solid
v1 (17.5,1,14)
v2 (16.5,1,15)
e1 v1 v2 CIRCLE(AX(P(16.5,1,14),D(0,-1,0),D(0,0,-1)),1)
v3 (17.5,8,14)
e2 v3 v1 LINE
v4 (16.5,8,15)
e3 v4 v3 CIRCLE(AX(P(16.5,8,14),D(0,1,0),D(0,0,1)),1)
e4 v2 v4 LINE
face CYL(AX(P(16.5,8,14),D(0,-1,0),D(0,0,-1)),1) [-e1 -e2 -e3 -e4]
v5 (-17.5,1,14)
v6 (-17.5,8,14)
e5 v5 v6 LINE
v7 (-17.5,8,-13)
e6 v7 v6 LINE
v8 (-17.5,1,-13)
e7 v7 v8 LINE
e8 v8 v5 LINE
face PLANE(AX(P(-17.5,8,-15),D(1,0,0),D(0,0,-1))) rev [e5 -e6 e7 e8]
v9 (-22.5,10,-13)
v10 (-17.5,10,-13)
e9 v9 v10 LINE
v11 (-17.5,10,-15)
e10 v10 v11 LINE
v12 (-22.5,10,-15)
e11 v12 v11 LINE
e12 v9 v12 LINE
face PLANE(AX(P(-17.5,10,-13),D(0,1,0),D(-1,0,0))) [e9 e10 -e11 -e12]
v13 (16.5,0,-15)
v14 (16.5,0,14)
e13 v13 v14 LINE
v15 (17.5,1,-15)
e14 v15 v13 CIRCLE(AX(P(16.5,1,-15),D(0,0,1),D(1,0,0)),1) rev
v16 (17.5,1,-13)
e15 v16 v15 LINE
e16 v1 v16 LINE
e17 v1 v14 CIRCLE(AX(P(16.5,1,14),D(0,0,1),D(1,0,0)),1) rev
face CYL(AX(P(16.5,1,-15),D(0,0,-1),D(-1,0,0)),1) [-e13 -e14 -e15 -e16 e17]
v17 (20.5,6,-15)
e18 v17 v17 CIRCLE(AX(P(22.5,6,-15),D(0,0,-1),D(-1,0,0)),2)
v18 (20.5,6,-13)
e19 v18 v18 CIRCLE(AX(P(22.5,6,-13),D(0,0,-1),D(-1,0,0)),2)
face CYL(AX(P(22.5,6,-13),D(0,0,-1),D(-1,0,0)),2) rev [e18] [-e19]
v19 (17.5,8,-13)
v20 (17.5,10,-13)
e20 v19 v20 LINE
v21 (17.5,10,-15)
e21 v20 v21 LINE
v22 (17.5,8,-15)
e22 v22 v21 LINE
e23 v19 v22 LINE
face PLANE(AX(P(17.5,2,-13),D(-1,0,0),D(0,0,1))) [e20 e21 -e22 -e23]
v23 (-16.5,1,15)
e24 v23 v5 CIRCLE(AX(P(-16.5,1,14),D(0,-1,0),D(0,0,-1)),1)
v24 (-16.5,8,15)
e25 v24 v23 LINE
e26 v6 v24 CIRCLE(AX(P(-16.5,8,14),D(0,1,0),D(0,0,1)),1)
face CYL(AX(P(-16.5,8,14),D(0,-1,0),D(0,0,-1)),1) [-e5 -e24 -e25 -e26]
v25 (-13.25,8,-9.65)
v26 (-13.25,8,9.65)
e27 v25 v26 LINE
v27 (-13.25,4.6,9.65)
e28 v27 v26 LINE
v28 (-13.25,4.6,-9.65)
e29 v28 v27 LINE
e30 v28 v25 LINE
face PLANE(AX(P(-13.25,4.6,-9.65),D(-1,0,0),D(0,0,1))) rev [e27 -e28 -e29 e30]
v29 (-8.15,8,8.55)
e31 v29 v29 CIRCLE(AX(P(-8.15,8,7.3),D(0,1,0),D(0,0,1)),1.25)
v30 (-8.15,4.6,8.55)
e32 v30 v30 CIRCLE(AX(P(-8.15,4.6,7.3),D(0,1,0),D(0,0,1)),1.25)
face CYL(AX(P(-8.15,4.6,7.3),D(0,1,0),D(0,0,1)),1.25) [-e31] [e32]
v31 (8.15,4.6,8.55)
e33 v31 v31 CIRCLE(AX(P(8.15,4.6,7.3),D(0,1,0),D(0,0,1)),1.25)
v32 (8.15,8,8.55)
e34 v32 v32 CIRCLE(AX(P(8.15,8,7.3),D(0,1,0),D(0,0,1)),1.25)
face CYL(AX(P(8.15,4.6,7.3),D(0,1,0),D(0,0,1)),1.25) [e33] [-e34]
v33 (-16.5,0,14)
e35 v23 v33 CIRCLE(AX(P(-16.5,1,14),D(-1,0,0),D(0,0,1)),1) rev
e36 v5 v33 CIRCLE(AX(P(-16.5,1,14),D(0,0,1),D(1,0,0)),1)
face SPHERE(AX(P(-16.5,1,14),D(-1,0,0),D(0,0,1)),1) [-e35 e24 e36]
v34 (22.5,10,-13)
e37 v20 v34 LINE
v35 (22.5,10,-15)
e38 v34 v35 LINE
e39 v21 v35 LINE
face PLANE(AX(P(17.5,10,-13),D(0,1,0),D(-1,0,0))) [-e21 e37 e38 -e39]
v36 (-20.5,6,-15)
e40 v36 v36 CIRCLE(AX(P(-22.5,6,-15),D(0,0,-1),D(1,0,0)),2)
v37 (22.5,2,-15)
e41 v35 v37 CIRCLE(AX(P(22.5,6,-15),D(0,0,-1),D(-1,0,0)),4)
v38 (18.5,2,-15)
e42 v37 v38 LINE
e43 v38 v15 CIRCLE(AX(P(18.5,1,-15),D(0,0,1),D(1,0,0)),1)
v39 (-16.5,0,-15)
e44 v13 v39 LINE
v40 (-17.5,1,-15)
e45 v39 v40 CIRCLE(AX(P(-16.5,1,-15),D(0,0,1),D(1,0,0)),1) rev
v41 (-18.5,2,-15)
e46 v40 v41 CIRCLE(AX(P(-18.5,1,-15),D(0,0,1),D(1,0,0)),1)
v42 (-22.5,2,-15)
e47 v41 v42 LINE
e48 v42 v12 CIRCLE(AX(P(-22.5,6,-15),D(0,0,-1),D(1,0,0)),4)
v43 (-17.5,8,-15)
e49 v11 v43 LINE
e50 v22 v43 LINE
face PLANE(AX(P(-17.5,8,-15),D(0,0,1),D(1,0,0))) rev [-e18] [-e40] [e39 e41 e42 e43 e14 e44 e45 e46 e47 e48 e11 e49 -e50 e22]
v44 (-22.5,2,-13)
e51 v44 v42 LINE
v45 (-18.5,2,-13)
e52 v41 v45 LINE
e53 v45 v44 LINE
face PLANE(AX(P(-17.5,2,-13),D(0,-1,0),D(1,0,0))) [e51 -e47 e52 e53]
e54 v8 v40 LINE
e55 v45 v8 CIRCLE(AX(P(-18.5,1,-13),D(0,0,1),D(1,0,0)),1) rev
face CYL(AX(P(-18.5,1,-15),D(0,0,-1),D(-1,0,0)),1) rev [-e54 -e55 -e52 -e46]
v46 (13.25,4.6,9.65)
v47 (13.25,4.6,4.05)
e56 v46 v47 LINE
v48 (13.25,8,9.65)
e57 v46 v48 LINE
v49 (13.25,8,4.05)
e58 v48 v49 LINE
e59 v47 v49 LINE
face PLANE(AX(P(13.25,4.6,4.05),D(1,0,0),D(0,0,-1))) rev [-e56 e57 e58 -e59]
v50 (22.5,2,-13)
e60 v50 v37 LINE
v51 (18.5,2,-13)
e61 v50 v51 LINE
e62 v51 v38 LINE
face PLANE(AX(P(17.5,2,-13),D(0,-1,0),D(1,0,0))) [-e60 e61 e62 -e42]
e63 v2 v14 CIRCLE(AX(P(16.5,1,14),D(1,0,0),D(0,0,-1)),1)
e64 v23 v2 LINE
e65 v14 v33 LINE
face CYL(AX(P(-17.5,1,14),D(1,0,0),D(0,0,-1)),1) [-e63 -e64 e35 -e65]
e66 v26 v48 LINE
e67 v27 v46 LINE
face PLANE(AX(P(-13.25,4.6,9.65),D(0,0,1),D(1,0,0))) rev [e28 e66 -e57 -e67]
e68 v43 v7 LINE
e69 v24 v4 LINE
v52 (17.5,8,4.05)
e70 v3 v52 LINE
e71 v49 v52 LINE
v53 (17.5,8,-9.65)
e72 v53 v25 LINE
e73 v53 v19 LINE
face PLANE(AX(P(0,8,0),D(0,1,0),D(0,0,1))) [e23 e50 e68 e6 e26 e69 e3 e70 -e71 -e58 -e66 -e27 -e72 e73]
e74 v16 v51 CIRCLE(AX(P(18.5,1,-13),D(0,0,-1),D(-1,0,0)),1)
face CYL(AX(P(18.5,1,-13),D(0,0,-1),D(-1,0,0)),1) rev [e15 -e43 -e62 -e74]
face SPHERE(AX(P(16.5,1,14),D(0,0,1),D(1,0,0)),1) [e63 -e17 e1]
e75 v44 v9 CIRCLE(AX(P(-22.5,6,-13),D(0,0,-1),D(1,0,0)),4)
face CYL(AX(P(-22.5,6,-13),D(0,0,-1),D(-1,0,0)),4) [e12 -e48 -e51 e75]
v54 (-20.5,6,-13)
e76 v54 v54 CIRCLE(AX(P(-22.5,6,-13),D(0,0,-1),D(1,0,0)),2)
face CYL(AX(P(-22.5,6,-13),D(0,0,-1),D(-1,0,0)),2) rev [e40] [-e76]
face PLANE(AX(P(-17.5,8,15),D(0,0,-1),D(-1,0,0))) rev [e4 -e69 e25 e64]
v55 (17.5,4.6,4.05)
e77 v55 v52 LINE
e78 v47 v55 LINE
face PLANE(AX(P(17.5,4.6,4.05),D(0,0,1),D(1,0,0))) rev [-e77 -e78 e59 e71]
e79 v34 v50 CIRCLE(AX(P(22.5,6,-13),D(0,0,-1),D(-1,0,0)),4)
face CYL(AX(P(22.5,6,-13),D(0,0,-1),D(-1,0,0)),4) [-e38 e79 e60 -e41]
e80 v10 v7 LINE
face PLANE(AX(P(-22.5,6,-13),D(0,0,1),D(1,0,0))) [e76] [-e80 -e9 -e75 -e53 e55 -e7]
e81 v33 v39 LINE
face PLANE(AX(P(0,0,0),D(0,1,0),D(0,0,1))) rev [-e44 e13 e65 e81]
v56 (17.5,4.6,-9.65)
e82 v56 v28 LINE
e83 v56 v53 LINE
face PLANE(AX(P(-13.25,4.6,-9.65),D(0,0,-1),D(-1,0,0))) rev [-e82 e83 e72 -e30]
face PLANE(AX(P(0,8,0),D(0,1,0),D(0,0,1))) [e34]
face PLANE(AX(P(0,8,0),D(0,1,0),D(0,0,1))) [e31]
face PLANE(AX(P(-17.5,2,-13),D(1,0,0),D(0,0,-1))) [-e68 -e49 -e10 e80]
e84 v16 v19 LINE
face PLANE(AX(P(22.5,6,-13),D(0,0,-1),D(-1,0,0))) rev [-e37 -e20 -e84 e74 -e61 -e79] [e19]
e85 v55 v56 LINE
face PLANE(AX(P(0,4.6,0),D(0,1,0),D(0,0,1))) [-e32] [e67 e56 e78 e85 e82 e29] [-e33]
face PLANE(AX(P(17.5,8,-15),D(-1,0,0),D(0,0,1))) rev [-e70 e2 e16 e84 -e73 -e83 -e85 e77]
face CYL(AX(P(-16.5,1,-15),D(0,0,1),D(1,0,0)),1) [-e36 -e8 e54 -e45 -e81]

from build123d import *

# Parameters (mm, degrees)
CROQUIS1_W              = 35
CROQUIS1_H              = 30
SALIENTE_EXTRUIR1_DEPTH = 8
CROQUIS2_R              = 1.25
CORTAR_EXTRUIR2_DEPTH   = 3.4
CROQUIS3_R              = 2
SALIENTE_EXTRUIR2_DEPTH = 2
REDONDEO1_R             = 1


with BuildPart() as part:
    # Croquis1 → Saliente-Extruir1 (new body)
    with BuildSketch(Plane(origin=(0, 0, 0), x_dir=(1, 0, 0), z_dir=(0, 1, 0))):
        Rectangle(CROQUIS1_W, CROQUIS1_H)
    extrude(amount=SALIENTE_EXTRUIR1_DEPTH)

    # Croquis2 → Cortar-Extruir2 (cut)
    with BuildSketch(Plane(origin=(0, 8, 0), x_dir=(1, 0, 0), z_dir=(0, 1, 0))):
        Polygon((13.25, 9.65), (17.5, 9.65), (17.5, -4.05), (13.25, -4.05), (13.25, -9.65), (-13.25, -9.65), (-13.25, 9.65), align=None)
        with Locations(Location((-8.15, -7.3, 0), (0, 0, 270))):
            Circle(CROQUIS2_R, mode=Mode.SUBTRACT)
        with Locations(Location((8.15, -7.3, 0), (0, 0, 270))):
            Circle(CROQUIS2_R, mode=Mode.SUBTRACT)
    extrude(amount=-CORTAR_EXTRUIR2_DEPTH, mode=Mode.SUBTRACT)

    # Croquis3 → Saliente-Extruir2 (add)
    # profile 1 of 2: a face of its own
    with BuildSketch(Plane(origin=(0, 0, -15), x_dir=(-1, 0, 0), z_dir=(0, 0, -1))):
        with BuildLine():
            Line((-17.5, 2), (-17.5, 10))
            Line((-17.5, 10), (-22.5, 10))
            ThreePointArc((-22.5, 10), (-26.5, 6), (-22.5, 2))
            Line((-22.5, 2), (-17.5, 2))
        make_face()
        with Locations((-22.5, 6)):
            Circle(CROQUIS3_R, mode=Mode.SUBTRACT)
    # profile 2 of 2: a face of its own
    with BuildSketch(Plane(origin=(0, 0, -15), x_dir=(-1, 0, 0), z_dir=(0, 0, -1))):
        with BuildLine():
            Line((17.5, 10), (22.5, 10))
            ThreePointArc((22.5, 10), (26.5, 6), (22.5, 2))
            Line((22.5, 2), (17.5, 2))
            Line((17.5, 2), (17.5, 10))
        make_face()
        with Locations(Location((22.5, 6, 0), (0, 0, 180))):
            Circle(CROQUIS3_R, mode=Mode.SUBTRACT)
    extrude(amount=-SALIENTE_EXTRUIR2_DEPTH)

    # Redondeo1
    redondeo1_edges = [part.edges().sort_by_distance(p)[0] for p in [
        (17.5, 2, -14),
        (17.5, 0, 0),
        (0, 0, 15),
        (-17.5, 0, 0),
        (-17.5, 2, -14),
        (-17.5, 4, 15),
        (17.5, 4, 15),
    ]]
    fillet(redondeo1_edges, radius=REDONDEO1_R - 0.0001)  # a hair under: the kernel refuses the full size


solid = part.part
